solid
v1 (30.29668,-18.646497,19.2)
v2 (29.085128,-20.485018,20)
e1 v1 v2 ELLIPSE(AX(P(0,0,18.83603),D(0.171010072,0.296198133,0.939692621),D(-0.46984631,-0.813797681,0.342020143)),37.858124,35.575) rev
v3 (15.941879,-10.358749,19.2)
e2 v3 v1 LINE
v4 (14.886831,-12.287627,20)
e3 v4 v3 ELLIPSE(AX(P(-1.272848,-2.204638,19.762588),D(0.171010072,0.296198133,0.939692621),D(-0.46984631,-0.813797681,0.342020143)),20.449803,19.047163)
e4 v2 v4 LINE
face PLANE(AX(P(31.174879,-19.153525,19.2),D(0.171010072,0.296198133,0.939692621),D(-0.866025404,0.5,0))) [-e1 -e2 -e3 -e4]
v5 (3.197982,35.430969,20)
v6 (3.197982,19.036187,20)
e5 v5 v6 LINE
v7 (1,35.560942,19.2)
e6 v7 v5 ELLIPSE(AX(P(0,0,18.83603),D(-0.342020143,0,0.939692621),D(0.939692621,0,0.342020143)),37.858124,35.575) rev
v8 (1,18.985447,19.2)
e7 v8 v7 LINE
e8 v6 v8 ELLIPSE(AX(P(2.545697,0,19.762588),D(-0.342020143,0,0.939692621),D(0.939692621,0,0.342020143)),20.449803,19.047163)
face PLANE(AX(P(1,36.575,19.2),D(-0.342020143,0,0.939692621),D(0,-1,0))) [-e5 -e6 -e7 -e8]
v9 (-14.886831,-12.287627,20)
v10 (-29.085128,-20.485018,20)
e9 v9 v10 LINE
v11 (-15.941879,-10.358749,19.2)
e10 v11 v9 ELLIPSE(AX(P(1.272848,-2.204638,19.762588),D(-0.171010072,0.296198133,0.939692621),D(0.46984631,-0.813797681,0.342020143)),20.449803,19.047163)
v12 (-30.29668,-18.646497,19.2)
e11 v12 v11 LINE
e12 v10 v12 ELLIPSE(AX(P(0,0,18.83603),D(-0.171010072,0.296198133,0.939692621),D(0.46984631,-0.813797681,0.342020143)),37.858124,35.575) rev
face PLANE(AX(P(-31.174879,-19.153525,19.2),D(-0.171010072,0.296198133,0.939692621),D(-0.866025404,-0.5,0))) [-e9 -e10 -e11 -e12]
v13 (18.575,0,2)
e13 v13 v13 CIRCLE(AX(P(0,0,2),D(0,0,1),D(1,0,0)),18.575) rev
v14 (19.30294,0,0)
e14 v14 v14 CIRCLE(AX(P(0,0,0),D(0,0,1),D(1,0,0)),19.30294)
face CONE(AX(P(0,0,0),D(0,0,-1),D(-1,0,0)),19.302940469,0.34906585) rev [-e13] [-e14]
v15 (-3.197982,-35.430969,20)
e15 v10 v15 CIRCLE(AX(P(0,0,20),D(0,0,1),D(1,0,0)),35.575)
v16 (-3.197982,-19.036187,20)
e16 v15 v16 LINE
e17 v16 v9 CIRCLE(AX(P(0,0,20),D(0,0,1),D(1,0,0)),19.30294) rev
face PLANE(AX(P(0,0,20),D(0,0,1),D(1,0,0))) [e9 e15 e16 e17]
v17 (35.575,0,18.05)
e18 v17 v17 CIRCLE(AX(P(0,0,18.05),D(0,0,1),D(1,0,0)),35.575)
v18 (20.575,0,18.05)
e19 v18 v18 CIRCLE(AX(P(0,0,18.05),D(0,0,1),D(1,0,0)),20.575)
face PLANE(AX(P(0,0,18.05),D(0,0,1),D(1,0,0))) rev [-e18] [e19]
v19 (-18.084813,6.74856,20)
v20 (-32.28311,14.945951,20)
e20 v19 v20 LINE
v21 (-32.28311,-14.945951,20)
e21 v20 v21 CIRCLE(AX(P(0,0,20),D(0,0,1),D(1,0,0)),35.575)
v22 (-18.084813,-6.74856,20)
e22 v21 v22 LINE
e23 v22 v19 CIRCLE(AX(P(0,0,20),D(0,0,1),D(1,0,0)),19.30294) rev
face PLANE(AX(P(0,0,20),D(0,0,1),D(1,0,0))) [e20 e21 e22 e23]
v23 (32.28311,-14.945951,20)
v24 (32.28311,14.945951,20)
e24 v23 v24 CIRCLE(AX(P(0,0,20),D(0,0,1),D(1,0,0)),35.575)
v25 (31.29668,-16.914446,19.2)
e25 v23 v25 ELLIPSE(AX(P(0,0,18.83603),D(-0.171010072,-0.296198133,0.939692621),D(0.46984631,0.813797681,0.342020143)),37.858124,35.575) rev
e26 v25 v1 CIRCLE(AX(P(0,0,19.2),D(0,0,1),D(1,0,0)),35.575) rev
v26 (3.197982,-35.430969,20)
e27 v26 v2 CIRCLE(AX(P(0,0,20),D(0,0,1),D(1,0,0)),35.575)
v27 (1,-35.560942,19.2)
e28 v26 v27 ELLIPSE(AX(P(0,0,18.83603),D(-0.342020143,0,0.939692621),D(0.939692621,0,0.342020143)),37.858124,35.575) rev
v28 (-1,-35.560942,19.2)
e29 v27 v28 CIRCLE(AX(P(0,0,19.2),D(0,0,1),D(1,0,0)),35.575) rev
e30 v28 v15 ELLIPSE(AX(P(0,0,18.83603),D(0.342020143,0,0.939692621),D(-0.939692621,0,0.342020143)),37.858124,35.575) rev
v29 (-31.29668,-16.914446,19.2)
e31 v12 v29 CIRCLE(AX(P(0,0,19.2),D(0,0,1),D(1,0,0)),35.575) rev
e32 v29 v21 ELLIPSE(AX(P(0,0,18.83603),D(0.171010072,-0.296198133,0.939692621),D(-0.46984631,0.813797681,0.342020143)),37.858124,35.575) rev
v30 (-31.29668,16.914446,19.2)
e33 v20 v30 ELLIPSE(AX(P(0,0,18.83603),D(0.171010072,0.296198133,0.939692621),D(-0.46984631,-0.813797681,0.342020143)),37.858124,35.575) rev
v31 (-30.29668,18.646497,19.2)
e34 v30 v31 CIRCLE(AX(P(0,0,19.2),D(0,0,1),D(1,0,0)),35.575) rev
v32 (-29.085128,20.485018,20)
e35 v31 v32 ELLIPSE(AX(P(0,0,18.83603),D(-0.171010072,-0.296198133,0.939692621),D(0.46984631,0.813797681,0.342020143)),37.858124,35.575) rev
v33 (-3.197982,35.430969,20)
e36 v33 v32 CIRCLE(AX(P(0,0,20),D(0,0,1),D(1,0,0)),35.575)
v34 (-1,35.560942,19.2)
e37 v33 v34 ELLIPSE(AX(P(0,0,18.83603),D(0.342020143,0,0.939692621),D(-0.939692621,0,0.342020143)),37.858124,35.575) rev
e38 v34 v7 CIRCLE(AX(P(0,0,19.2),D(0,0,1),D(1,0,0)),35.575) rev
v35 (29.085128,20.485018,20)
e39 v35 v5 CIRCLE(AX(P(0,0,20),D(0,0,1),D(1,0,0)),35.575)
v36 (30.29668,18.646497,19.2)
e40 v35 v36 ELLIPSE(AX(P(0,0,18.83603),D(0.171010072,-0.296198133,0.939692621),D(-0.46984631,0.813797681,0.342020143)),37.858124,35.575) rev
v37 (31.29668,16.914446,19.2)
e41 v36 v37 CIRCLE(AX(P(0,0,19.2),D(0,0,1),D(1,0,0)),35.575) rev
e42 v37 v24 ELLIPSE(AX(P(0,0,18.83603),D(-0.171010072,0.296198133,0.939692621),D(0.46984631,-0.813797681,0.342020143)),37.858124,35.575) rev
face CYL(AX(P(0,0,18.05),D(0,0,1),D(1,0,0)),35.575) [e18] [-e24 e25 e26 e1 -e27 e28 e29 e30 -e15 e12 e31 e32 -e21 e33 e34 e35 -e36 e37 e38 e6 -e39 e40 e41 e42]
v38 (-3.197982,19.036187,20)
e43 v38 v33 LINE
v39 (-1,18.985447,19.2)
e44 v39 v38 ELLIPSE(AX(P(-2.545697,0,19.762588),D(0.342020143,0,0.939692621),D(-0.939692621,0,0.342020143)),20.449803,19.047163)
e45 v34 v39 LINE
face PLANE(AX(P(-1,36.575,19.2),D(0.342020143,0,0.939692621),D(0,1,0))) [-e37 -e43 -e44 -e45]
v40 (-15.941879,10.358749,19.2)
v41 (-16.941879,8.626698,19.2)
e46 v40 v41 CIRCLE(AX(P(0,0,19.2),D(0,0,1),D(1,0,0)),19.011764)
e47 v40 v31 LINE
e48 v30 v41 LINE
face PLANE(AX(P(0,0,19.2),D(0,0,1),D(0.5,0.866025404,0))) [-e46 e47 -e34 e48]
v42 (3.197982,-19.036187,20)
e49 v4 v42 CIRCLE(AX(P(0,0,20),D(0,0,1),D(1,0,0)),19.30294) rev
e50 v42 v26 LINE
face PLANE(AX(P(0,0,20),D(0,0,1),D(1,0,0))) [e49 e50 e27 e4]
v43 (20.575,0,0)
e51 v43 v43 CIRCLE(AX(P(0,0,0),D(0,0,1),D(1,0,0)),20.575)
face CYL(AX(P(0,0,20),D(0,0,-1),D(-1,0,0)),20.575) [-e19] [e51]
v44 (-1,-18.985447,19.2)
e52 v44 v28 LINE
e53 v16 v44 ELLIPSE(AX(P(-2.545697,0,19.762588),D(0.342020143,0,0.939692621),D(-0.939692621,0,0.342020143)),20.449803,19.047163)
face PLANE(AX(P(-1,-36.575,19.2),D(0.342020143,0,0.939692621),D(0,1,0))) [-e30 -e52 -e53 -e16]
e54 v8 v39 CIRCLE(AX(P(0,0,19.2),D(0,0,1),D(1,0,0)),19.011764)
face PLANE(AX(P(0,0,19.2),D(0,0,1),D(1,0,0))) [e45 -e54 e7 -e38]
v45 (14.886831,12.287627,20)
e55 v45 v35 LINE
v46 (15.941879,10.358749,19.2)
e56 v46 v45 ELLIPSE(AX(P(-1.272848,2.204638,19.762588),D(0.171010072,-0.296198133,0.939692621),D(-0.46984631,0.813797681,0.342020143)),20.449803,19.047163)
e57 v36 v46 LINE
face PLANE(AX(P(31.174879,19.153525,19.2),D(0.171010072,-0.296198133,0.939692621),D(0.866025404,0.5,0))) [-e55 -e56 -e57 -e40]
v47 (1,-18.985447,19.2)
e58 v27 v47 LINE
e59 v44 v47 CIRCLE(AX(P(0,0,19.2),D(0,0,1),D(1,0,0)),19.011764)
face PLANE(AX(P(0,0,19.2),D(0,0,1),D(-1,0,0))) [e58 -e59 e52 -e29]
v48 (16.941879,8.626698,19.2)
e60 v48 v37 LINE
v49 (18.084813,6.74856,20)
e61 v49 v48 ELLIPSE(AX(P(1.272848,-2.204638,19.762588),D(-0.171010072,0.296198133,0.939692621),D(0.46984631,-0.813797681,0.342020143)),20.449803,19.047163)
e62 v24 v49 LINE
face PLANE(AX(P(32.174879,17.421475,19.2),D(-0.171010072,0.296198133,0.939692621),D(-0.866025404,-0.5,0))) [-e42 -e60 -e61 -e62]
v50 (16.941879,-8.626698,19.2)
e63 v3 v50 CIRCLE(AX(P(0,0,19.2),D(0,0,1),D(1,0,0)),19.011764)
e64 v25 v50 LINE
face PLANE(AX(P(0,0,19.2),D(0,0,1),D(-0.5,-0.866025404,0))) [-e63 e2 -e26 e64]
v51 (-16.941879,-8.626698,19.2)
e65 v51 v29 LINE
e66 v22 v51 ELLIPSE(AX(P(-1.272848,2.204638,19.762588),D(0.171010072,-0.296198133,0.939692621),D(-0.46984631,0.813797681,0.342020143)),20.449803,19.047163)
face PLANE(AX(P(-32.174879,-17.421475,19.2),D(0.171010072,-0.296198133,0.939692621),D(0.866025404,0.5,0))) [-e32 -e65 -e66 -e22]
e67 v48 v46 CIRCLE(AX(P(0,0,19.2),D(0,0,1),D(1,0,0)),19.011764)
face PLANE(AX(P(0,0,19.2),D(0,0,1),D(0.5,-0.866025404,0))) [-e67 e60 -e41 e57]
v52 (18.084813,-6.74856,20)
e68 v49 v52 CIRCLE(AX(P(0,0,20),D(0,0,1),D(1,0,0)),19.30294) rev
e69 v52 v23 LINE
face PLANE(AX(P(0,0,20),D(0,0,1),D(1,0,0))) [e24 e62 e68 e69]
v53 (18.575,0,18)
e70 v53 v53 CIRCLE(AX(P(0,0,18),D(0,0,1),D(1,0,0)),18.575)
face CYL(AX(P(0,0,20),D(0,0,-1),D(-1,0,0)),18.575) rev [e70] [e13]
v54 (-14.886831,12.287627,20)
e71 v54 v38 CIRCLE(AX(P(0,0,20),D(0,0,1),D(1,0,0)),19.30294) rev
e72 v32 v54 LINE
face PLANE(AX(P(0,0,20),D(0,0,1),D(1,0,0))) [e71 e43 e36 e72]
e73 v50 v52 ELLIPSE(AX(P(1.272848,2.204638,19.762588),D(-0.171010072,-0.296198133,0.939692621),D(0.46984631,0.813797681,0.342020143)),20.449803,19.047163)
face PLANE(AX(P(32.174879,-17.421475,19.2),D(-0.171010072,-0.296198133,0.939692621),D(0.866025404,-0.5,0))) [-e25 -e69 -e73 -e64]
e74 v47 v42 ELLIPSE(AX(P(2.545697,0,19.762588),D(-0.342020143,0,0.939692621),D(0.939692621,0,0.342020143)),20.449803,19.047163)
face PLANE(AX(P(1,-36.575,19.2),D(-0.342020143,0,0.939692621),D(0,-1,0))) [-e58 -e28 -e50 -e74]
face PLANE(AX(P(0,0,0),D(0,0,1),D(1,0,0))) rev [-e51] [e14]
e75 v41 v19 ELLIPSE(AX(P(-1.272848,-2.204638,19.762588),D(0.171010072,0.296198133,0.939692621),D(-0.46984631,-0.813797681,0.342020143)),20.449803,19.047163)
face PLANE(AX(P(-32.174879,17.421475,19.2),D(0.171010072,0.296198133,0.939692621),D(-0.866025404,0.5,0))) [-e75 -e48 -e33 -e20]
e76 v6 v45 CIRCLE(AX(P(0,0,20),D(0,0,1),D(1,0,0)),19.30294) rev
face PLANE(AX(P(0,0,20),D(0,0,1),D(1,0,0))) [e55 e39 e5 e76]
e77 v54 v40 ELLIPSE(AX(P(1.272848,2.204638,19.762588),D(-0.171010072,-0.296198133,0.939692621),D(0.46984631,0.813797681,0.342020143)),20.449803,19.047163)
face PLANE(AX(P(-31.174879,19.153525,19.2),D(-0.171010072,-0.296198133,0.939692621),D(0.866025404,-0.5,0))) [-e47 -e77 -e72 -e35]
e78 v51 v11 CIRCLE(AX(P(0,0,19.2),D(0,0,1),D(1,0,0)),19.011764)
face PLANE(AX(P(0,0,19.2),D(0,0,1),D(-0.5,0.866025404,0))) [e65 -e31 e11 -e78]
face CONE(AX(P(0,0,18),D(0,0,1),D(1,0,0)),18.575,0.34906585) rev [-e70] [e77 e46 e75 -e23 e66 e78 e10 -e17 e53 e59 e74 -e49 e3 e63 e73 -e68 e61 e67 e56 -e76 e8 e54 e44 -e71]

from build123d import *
from OCP.BRepFilletAPI import BRepFilletAPI_MakeChamfer

# Parameters (mm, degrees)
SKETCH1_R                      = 20.575
SKETCH1_R_2                    = 18.575
BOSS_EXTRUDE1_DEPTH            = 20
BOSS_EXTRUDE2_START            = -1.95
SKETCH2_R                      = 35.575
SKETCH2_R_2                    = 20.575
BOSS_EXTRUDE2_DEPTH            = 1.95
CHAMFER2_SIZE                  = 2
CHAMFER2_SIZE2                 = 0.727940469
SKETCH3_W                      = 2
SKETCH3_H                      = 18
CUT_EXTRUDE1_DEPTH             = 0.8
CHAMFER3_SIZE                  = 2.197981936
CHAMFER3_SIZE_2                = 0.8
CIRPATTERN2_COUNT              = 6
CHAMFER3_OF_CIRPATTERN2_SIZE   = 2.197981936
CHAMFER3_OF_CIRPATTERN2_SIZE_2 = 0.8


with BuildPart() as part:
    # Sketch1 → Boss-Extrude1 (new body)
    with BuildSketch(Plane.XY):
        Circle(SKETCH1_R)
        Circle(SKETCH1_R_2, mode=Mode.SUBTRACT)
    extrude(amount=BOSS_EXTRUDE1_DEPTH)

    # Sketch2 → Boss-Extrude2 (add)
    with BuildSketch(Plane.XY.offset(20).offset(BOSS_EXTRUDE2_START)):
        Circle(SKETCH2_R)
        Circle(SKETCH2_R_2, mode=Mode.SUBTRACT)
    extrude(amount=BOSS_EXTRUDE2_DEPTH)

    # Chamfer2
    chamfer2_edges = [part.edges().sort_by_distance(p)[0] for p in [
        (-18.575, 0, 0),
        (-18.575, 0, 20),
    ]]
    chamfer2_side = [part.faces().sort_by_distance(p)[0] for p in [
        (-18.575, 0, 10),
    ]]
    chamfer(chamfer2_edges, length=CHAMFER2_SIZE, length2=CHAMFER2_SIZE2, reference=chamfer2_side[0])

    # Sketch3 → Cut-Extrude1 (cut)
    with BuildSketch(Plane.XY.offset(20)):
        with Locations((0, 27.575)):
            Rectangle(SKETCH3_W, SKETCH3_H)
    cut_extrude1 = extrude(amount=-CUT_EXTRUDE1_DEPTH, mode=Mode.SUBTRACT)

    # Chamfer3
    chamfer3_edges_1 = [part.edges().sort_by_distance(p)[0] for p in [
        (1, 27.418981343, 20),
    ]]
    chamfer3_side_1 = [part.faces().sort_by_distance(p)[0] for p in [
        (1.016, 27.418981343, 20),
    ]]
    chamfer3_edges_2 = [part.edges().sort_by_distance(p)[0] for p in [
        (-1, 27.418981343, 20),
    ]]
    chamfer3_side_2 = [part.faces().sort_by_distance(p)[0] for p in [
        (-1.016, 27.418981343, 20),
    ]]
    chamfer3 = BRepFilletAPI_MakeChamfer(part.part.solid().wrapped)
    for e in chamfer3_edges_1:
        chamfer3.Add(CHAMFER3_SIZE - 0.0001, CHAMFER3_SIZE_2 - 0.0001, e.wrapped, chamfer3_side_1[0].wrapped)
    for e in chamfer3_edges_2:
        chamfer3.Add(CHAMFER3_SIZE - 0.0001, CHAMFER3_SIZE_2 - 0.0001, e.wrapped, chamfer3_side_2[0].wrapped)
    add(Compound.cast(chamfer3.Shape()), mode=Mode.REPLACE)  # a hair under: the kernel refuses the full size

    # CirPattern2: Cut-Extrude1 ×6 about axis
    cirpattern2_axis = Axis((0, 0, 0), (0, 0, 1))
    for i in range(1, CIRPATTERN2_COUNT):
        add(cut_extrude1.rotate(cirpattern2_axis, i * 360 / CIRPATTERN2_COUNT), mode=Mode.SUBTRACT)

    # Chamfer3 of CirPattern2
    chamfer3_of_cirpattern2_edges_1 = [part.edges().sort_by_distance(p)[0] for p in [
        (-23.245534389, 14.575516075, 20),
    ]]
    chamfer3_of_cirpattern2_side_1 = [part.faces().sort_by_distance(p)[0] for p in [
        (-23.237534389, 14.589372482, 20),
    ]]
    chamfer3_of_cirpattern2_edges_2 = [part.edges().sort_by_distance(p)[0] for p in [
        (-24.245534389, 12.843465267, 20),
    ]]
    chamfer3_of_cirpattern2_side_2 = [part.faces().sort_by_distance(p)[0] for p in [
        (-24.245534389, 12.843465267, 19.984),
    ]]
    chamfer3_of_cirpattern2_edges_3 = [part.edges().sort_by_distance(p)[0] for p in [
        (-24.245534389, -12.843465267, 20),
    ]]
    chamfer3_of_cirpattern2_side_3 = [part.faces().sort_by_distance(p)[0] for p in [
        (-24.253534389, -12.829608861, 20),
    ]]
    chamfer3_of_cirpattern2_edges_4 = [part.edges().sort_by_distance(p)[0] for p in [
        (-23.245534389, -14.575516075, 20),
    ]]
    chamfer3_of_cirpattern2_side_4 = [part.faces().sort_by_distance(p)[0] for p in [
        (-23.245534389, -14.575516075, 19.984),
    ]]
    chamfer3_of_cirpattern2_edges_5 = [part.edges().sort_by_distance(p)[0] for p in [
        (-1, -27.418981343, 20),
    ]]
    chamfer3_of_cirpattern2_side_5 = [part.faces().sort_by_distance(p)[0] for p in [
        (-1.016, -27.418981343, 20),
    ]]
    chamfer3_of_cirpattern2_edges_6 = [part.edges().sort_by_distance(p)[0] for p in [
        (1, -27.418981343, 20),
    ]]
    chamfer3_of_cirpattern2_side_6 = [part.faces().sort_by_distance(p)[0] for p in [
        (1, -27.418981343, 19.984),
    ]]
    chamfer3_of_cirpattern2_edges_7 = [part.edges().sort_by_distance(p)[0] for p in [
        (23.245534389, -14.575516075, 20),
    ]]
    chamfer3_of_cirpattern2_side_7 = [part.faces().sort_by_distance(p)[0] for p in [
        (23.237534389, -14.589372482, 20),
    ]]
    chamfer3_of_cirpattern2_edges_8 = [part.edges().sort_by_distance(p)[0] for p in [
        (24.245534389, -12.843465267, 20),
    ]]
    chamfer3_of_cirpattern2_side_8 = [part.faces().sort_by_distance(p)[0] for p in [
        (24.245534389, -12.843465267, 19.984),
    ]]
    chamfer3_of_cirpattern2_edges_9 = [part.edges().sort_by_distance(p)[0] for p in [
        (24.245534389, 12.843465267, 20),
    ]]
    chamfer3_of_cirpattern2_side_9 = [part.faces().sort_by_distance(p)[0] for p in [
        (24.253534389, 12.829608861, 20),
    ]]
    chamfer3_of_cirpattern2_edges_10 = [part.edges().sort_by_distance(p)[0] for p in [
        (23.245534389, 14.575516075, 20),
    ]]
    chamfer3_of_cirpattern2_side_10 = [part.faces().sort_by_distance(p)[0] for p in [
        (23.245534389, 14.575516075, 19.984),
    ]]
    chamfer3_of_cirpattern2 = BRepFilletAPI_MakeChamfer(part.part.solid().wrapped)
    for e in chamfer3_of_cirpattern2_edges_1:
        chamfer3_of_cirpattern2.Add(CHAMFER3_OF_CIRPATTERN2_SIZE - 0.0001, CHAMFER3_OF_CIRPATTERN2_SIZE_2 - 0.0001, e.wrapped, chamfer3_of_cirpattern2_side_1[0].wrapped)
    for e in chamfer3_of_cirpattern2_edges_2:
        chamfer3_of_cirpattern2.Add(CHAMFER3_OF_CIRPATTERN2_SIZE_2 - 0.0001, CHAMFER3_OF_CIRPATTERN2_SIZE - 0.0001, e.wrapped, chamfer3_of_cirpattern2_side_2[0].wrapped)
    for e in chamfer3_of_cirpattern2_edges_3:
        chamfer3_of_cirpattern2.Add(CHAMFER3_OF_CIRPATTERN2_SIZE - 0.0001, CHAMFER3_OF_CIRPATTERN2_SIZE_2 - 0.0001, e.wrapped, chamfer3_of_cirpattern2_side_3[0].wrapped)
    for e in chamfer3_of_cirpattern2_edges_4:
        chamfer3_of_cirpattern2.Add(CHAMFER3_OF_CIRPATTERN2_SIZE_2 - 0.0001, CHAMFER3_OF_CIRPATTERN2_SIZE - 0.0001, e.wrapped, chamfer3_of_cirpattern2_side_4[0].wrapped)
    for e in chamfer3_of_cirpattern2_edges_5:
        chamfer3_of_cirpattern2.Add(CHAMFER3_OF_CIRPATTERN2_SIZE - 0.0001, CHAMFER3_OF_CIRPATTERN2_SIZE_2 - 0.0001, e.wrapped, chamfer3_of_cirpattern2_side_5[0].wrapped)
    for e in chamfer3_of_cirpattern2_edges_6:
        chamfer3_of_cirpattern2.Add(CHAMFER3_OF_CIRPATTERN2_SIZE_2 - 0.0001, CHAMFER3_OF_CIRPATTERN2_SIZE - 0.0001, e.wrapped, chamfer3_of_cirpattern2_side_6[0].wrapped)
    for e in chamfer3_of_cirpattern2_edges_7:
        chamfer3_of_cirpattern2.Add(CHAMFER3_OF_CIRPATTERN2_SIZE - 0.0001, CHAMFER3_OF_CIRPATTERN2_SIZE_2 - 0.0001, e.wrapped, chamfer3_of_cirpattern2_side_7[0].wrapped)
    for e in chamfer3_of_cirpattern2_edges_8:
        chamfer3_of_cirpattern2.Add(CHAMFER3_OF_CIRPATTERN2_SIZE_2 - 0.0001, CHAMFER3_OF_CIRPATTERN2_SIZE - 0.0001, e.wrapped, chamfer3_of_cirpattern2_side_8[0].wrapped)
    for e in chamfer3_of_cirpattern2_edges_9:
        chamfer3_of_cirpattern2.Add(CHAMFER3_OF_CIRPATTERN2_SIZE - 0.0001, CHAMFER3_OF_CIRPATTERN2_SIZE_2 - 0.0001, e.wrapped, chamfer3_of_cirpattern2_side_9[0].wrapped)
    for e in chamfer3_of_cirpattern2_edges_10:
        chamfer3_of_cirpattern2.Add(CHAMFER3_OF_CIRPATTERN2_SIZE_2 - 0.0001, CHAMFER3_OF_CIRPATTERN2_SIZE - 0.0001, e.wrapped, chamfer3_of_cirpattern2_side_10[0].wrapped)
    add(Compound.cast(chamfer3_of_cirpattern2.Shape()), mode=Mode.REPLACE)  # a hair under: the kernel refuses the full size


solid = part.part
